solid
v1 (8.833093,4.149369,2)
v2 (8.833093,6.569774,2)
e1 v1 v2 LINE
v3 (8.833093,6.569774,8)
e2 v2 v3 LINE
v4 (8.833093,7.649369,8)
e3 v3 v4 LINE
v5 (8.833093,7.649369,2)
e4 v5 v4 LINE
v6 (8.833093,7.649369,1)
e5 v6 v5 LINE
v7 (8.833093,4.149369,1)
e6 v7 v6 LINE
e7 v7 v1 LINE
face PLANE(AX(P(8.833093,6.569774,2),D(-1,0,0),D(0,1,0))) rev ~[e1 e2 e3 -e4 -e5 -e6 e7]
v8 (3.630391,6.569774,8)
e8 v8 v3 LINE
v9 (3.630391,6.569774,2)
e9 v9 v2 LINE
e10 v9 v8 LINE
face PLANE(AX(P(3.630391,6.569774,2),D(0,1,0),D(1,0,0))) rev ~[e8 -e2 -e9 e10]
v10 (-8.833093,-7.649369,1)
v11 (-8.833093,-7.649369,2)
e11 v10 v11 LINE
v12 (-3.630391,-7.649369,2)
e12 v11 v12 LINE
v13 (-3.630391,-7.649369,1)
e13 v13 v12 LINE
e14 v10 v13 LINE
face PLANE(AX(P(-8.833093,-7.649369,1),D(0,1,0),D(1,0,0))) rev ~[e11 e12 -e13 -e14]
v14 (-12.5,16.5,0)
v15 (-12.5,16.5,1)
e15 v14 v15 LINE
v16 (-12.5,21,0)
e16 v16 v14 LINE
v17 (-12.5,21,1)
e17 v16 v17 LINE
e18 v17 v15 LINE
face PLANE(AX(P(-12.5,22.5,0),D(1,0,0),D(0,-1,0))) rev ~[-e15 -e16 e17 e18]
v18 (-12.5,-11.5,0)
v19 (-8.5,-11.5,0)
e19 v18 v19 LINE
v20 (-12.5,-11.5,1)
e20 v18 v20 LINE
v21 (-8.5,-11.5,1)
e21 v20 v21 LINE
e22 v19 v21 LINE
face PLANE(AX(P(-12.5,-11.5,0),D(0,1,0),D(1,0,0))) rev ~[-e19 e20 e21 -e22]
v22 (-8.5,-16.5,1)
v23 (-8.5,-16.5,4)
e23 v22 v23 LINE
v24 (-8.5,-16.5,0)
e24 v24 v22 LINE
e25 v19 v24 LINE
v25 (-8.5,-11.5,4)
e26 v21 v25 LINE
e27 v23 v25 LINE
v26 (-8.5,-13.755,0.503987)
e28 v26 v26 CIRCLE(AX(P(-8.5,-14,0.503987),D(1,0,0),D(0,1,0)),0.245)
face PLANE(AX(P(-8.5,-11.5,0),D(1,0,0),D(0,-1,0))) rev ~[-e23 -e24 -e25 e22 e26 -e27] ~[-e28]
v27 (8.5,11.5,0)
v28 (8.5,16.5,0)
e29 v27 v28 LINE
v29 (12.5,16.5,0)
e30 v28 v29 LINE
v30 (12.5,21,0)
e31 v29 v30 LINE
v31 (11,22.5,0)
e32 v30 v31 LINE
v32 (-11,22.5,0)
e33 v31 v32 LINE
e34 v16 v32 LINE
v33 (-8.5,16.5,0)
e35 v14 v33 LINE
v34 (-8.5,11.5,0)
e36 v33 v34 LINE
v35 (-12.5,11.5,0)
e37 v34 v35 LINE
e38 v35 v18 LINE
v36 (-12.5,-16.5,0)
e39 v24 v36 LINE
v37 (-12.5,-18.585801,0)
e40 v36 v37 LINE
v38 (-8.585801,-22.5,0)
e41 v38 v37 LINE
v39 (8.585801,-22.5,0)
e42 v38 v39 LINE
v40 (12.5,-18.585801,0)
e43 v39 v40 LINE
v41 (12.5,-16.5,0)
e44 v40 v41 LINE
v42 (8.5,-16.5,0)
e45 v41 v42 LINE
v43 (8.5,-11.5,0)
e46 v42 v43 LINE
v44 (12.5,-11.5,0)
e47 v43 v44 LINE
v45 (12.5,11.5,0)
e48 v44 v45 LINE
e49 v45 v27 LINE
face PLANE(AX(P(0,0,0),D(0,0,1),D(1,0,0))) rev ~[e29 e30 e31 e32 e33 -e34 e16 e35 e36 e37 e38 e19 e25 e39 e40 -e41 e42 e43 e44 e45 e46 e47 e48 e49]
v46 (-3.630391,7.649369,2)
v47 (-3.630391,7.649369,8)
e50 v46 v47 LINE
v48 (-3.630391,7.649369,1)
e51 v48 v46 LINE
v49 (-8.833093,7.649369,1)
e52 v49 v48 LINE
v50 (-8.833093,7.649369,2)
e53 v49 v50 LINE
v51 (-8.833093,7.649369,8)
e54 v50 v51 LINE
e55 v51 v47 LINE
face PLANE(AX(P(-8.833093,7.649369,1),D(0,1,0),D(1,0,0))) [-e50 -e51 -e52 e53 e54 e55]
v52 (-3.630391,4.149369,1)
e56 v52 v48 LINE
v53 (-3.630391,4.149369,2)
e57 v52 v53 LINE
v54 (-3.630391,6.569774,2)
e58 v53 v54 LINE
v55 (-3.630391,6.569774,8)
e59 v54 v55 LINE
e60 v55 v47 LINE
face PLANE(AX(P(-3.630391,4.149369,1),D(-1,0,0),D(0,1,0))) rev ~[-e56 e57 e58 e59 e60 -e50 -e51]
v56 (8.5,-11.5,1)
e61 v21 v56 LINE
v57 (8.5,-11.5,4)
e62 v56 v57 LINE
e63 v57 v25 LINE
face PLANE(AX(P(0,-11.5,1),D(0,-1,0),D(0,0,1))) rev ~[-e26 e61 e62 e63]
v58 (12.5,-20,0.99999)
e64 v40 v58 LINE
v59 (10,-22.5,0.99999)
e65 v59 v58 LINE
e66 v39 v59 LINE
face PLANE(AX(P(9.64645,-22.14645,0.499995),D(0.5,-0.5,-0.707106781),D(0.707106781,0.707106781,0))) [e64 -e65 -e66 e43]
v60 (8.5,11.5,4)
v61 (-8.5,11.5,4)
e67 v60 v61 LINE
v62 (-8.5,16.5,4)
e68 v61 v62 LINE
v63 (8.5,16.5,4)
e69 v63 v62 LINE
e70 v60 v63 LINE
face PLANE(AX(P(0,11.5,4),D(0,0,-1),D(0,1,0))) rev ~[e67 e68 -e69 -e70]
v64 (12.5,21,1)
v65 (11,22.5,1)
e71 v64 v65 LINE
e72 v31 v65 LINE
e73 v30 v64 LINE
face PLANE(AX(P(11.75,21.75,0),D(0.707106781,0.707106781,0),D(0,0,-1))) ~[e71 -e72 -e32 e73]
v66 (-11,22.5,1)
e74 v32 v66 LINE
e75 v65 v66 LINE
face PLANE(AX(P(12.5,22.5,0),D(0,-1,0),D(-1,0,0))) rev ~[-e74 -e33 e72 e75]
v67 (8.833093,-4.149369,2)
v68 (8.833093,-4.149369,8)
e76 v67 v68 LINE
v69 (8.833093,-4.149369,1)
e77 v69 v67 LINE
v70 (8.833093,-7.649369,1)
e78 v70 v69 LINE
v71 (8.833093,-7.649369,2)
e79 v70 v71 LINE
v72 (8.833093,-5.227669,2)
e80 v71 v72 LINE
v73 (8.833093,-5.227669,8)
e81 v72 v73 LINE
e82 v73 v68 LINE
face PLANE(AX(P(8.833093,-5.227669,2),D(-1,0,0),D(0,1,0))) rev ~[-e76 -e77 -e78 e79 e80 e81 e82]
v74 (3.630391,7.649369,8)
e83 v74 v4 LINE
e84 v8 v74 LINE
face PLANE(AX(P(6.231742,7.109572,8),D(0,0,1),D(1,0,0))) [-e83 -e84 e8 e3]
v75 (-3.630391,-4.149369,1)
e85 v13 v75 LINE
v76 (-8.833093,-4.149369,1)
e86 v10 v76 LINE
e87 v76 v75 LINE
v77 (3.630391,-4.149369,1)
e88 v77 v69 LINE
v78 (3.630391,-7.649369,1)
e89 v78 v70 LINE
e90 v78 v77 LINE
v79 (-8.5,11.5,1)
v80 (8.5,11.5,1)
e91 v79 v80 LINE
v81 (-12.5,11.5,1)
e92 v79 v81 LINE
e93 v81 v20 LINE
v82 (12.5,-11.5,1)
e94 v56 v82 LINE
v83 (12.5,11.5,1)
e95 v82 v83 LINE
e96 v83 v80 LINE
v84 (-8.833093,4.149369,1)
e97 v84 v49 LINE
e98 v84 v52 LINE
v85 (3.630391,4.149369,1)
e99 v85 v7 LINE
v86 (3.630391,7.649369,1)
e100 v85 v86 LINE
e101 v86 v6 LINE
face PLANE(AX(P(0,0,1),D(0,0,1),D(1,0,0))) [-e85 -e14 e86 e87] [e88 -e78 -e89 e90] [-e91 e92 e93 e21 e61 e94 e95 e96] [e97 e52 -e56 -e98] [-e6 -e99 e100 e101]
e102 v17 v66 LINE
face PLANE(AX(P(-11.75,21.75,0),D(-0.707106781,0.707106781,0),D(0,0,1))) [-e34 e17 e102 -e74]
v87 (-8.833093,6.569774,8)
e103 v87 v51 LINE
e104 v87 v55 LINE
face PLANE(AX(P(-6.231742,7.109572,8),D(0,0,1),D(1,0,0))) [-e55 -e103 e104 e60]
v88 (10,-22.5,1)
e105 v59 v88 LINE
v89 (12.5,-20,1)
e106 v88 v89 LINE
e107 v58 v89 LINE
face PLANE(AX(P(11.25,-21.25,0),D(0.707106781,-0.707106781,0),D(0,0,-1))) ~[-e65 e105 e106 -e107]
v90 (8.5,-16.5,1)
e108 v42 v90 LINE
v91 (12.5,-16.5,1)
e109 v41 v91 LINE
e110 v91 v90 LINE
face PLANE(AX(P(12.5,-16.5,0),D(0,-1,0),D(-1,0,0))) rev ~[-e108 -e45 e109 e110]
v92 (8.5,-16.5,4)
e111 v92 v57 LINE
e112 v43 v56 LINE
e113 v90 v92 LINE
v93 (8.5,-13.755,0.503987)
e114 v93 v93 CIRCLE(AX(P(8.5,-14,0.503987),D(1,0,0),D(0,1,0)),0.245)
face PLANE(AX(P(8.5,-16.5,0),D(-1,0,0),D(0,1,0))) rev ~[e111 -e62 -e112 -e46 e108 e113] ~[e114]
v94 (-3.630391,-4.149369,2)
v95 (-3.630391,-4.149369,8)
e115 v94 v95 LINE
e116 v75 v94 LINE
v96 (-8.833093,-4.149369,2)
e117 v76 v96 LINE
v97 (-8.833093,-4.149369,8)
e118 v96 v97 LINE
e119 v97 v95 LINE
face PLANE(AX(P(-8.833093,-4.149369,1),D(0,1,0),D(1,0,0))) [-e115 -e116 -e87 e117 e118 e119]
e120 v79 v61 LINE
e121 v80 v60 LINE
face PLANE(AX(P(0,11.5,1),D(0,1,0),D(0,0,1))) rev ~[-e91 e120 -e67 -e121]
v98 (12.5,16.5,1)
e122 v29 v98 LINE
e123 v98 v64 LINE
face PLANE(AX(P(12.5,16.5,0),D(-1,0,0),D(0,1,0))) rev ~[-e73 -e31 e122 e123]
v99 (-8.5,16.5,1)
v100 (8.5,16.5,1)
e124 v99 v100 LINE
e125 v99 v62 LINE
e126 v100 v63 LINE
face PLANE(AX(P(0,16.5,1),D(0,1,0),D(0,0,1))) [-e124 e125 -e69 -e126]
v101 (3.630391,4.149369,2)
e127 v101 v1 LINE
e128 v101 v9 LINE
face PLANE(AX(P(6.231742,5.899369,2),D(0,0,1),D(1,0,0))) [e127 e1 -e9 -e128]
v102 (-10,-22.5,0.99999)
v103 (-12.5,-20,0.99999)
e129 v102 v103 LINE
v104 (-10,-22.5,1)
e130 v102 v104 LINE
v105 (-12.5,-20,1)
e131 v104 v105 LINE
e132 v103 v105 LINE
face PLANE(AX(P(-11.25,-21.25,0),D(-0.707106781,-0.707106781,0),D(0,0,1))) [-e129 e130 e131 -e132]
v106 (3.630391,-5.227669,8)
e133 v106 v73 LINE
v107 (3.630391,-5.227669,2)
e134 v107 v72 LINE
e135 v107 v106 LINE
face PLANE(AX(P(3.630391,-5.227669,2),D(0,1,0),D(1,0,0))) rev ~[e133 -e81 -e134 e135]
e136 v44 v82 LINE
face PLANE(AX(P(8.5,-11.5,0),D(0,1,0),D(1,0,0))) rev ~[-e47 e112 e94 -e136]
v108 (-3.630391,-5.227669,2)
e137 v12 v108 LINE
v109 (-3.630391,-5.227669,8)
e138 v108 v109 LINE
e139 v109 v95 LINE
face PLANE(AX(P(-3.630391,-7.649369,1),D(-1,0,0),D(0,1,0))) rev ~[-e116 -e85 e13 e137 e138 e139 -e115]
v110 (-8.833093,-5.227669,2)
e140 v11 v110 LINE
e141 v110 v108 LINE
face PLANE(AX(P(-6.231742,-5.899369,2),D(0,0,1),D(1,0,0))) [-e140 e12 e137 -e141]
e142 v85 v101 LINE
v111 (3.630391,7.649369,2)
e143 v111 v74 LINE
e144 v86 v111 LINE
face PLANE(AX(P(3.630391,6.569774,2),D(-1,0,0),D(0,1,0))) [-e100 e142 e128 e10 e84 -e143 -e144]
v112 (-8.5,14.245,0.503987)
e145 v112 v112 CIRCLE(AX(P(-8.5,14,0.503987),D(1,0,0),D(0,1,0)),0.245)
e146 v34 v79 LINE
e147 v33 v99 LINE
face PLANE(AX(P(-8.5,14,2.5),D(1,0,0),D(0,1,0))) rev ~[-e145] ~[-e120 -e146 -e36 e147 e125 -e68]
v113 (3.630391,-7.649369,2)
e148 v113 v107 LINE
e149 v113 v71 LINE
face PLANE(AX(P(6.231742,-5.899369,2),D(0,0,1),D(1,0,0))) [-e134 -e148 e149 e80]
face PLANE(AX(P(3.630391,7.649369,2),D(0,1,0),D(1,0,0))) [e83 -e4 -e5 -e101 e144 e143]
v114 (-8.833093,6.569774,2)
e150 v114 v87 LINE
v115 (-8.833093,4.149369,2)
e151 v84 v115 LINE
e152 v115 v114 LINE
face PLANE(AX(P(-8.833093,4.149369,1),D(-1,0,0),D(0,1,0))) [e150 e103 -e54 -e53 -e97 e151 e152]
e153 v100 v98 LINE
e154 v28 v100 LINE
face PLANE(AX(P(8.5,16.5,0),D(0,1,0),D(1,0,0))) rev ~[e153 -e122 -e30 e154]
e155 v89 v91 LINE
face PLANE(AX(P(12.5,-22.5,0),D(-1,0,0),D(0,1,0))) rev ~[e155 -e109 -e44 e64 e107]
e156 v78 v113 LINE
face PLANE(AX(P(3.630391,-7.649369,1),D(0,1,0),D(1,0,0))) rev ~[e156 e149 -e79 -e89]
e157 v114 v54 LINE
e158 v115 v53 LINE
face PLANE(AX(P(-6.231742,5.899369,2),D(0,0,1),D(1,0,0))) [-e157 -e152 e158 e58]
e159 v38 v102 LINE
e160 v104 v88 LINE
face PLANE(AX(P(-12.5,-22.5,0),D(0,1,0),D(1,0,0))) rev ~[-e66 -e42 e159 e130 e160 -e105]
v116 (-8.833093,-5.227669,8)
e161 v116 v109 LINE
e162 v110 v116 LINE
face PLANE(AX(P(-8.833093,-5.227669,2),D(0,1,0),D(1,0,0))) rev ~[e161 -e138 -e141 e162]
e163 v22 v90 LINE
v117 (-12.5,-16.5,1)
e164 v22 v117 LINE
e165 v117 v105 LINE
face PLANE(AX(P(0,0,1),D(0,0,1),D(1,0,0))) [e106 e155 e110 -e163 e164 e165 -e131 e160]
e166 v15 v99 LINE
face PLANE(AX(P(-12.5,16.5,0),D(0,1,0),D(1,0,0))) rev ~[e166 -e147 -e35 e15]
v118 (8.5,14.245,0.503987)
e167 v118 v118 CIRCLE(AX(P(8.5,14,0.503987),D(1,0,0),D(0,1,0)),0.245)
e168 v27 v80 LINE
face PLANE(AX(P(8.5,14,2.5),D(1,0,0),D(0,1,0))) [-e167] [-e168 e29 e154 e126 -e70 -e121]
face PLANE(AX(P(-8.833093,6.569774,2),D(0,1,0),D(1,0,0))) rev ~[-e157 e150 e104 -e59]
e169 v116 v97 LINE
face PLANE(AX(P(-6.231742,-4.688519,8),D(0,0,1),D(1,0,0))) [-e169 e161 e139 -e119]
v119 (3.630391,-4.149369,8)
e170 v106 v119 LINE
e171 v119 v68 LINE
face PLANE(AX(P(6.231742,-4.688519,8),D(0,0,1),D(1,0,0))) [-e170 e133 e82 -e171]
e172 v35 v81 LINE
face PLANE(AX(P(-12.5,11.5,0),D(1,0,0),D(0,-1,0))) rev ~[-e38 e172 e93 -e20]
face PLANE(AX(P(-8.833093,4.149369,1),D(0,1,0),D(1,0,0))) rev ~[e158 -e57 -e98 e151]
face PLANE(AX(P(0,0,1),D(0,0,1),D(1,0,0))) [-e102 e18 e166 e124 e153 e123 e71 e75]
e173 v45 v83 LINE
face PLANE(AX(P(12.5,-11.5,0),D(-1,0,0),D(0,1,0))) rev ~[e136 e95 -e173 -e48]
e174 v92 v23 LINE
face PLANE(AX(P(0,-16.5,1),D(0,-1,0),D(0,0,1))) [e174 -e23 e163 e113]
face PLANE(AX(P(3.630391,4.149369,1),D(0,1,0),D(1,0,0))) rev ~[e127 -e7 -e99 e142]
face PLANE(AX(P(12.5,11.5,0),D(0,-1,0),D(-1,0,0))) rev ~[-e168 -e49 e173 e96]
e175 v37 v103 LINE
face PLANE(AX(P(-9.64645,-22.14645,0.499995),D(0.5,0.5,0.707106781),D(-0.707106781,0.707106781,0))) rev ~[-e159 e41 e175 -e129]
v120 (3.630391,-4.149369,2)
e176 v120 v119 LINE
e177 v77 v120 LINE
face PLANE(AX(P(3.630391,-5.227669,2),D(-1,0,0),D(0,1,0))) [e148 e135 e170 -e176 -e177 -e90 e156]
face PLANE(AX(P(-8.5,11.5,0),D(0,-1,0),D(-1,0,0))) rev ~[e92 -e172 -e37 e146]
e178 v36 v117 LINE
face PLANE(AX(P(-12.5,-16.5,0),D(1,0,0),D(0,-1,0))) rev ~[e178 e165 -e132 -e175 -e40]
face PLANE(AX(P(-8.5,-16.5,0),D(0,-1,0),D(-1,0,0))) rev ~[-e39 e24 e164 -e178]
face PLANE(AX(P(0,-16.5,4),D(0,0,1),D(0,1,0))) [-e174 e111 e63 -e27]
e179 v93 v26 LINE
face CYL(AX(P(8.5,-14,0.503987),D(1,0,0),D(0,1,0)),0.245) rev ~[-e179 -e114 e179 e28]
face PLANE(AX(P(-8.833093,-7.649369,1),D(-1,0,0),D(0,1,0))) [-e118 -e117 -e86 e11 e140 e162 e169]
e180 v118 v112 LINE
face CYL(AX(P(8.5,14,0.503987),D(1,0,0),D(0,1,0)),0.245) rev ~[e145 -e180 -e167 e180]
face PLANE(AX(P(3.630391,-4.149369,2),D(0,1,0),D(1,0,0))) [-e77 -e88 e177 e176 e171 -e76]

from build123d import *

# Parameters (mm, degrees)
F1_DEPTH  = 1
F2_W      = 5
F2_H      = 3
F3_DEPTH  = 8.5
F4_SIZE   = 2.5
F5_SIZE   = 1.5
F6_SIZE   = 0.99999
F7_R      = 0.245
F8_DEPTH  = 17
F9_W      = 5.2027019071
F9_H      = 3.5
F10_DEPTH = 1
F11_W     = 5.2027019071
F11_H     = 1.0782994613
F12_DEPTH = 6
F13_W     = 5.2027019071
F13_H     = 1.0795953252
F14_DEPTH = 6


# Not quite as in the source:
# - a fillet or chamfer is up to 0.001 mm smaller than in the source, because OpenCascade refuses the exact size


with BuildPart() as f1:
    # F0 (on Top) → F1 (new body)
    with BuildSketch(Plane.XY):
        Polygon((-12.5, -22.5), (12.5, -22.5), (12.5, -16.5), (8.5, -16.5), (8.5, -11.5), (12.5, -11.5), (12.5, 11.5), (8.5, 11.5), (8.5, 16.5), (12.5, 16.5), (12.5, 22.5), (-12.5, 22.5), (-12.5, 16.5), (-8.5, 16.5), (-8.5, 11.5), (-12.5, 11.5), (-12.5, -11.5), (-8.5, -11.5), (-8.5, -16.5), (-12.5, -16.5), align=None)
    extrude(amount=F1_DEPTH)

    # F2 (on Right) → F3 (join, symmetric)
    with BuildSketch(Plane.YZ):
        with Locations((-14, 2.5)):
            Rectangle(F2_W, F2_H)
        with Locations((14, 2.5)):
            Rectangle(F2_W, F2_H)
    extrude(amount=F3_DEPTH, both=True)

    # F4
    f4_edges = [f1.edges().sort_by_distance(p)[0] for p in [
        (12.5, -22.5, 0.5),
        (-12.5, -22.5, 0.5),
    ]]
    chamfer(f4_edges, length=F4_SIZE)

    # F5
    f5_edges = [f1.edges().sort_by_distance(p)[0] for p in [
        (12.5, 22.5, 0.5),
        (-12.5, 22.5, 0.5),
    ]]
    chamfer(f5_edges, length=F5_SIZE)

    # F6 (size 1 in the source; OpenCascade refuses exactly that, so slightly less here)
    f6_edges = [f1.edges().sort_by_distance(p)[0] for p in [
        (-11.25, -21.25, 0),
        (11.25, -21.25, 0),
    ]]
    chamfer(f6_edges, length=F6_SIZE)

    # F7 (on face) → F8 (cut)
    with BuildSketch(Plane.YZ.offset(8.5)):
        with Locations((-14, 0.5039868411)):
            Circle(F7_R)
        with Locations((14, 0.5039868411)):
            Circle(F7_R)
    extrude(amount=-F8_DEPTH, mode=Mode.SUBTRACT)

    # F9 (on face) → F10 (join)
    with BuildSketch(Plane.XY.offset(1)):
        with Locations((6.2317421885, -5.8993692152)):
            Rectangle(F9_W, F9_H)
        with Locations((-6.2317421885, -5.8993692152)):
            Rectangle(F9_W, F9_H)
        with Locations((-6.2317421885, 5.8993692152)):
            Rectangle(F9_W, F9_H)
        with Locations((6.2317421885, 5.8993692152)):
            Rectangle(F9_W, F9_H)
    extrude(amount=F10_DEPTH)

    # F11 (on face) → F12 (join)
    with BuildSketch(Plane.XY.offset(2)):
        with Locations((6.2317421885, -4.6885189459)):
            Rectangle(F11_W, F11_H)
        with Locations((-6.2317421885, -4.6885189459)):
            Rectangle(F11_W, F11_H)
    extrude(amount=F12_DEPTH)

    # F13 (on face) → F14 (join)
    with BuildSketch(Plane.XY.offset(2)):
        with Locations((6.2317421885, 7.1095715527)):
            Rectangle(F13_W, F13_H)
        with Locations((-6.2317421885, 7.1095715527)):
            Rectangle(F13_W, F13_H)
    extrude(amount=F14_DEPTH)


solid = f1.part
